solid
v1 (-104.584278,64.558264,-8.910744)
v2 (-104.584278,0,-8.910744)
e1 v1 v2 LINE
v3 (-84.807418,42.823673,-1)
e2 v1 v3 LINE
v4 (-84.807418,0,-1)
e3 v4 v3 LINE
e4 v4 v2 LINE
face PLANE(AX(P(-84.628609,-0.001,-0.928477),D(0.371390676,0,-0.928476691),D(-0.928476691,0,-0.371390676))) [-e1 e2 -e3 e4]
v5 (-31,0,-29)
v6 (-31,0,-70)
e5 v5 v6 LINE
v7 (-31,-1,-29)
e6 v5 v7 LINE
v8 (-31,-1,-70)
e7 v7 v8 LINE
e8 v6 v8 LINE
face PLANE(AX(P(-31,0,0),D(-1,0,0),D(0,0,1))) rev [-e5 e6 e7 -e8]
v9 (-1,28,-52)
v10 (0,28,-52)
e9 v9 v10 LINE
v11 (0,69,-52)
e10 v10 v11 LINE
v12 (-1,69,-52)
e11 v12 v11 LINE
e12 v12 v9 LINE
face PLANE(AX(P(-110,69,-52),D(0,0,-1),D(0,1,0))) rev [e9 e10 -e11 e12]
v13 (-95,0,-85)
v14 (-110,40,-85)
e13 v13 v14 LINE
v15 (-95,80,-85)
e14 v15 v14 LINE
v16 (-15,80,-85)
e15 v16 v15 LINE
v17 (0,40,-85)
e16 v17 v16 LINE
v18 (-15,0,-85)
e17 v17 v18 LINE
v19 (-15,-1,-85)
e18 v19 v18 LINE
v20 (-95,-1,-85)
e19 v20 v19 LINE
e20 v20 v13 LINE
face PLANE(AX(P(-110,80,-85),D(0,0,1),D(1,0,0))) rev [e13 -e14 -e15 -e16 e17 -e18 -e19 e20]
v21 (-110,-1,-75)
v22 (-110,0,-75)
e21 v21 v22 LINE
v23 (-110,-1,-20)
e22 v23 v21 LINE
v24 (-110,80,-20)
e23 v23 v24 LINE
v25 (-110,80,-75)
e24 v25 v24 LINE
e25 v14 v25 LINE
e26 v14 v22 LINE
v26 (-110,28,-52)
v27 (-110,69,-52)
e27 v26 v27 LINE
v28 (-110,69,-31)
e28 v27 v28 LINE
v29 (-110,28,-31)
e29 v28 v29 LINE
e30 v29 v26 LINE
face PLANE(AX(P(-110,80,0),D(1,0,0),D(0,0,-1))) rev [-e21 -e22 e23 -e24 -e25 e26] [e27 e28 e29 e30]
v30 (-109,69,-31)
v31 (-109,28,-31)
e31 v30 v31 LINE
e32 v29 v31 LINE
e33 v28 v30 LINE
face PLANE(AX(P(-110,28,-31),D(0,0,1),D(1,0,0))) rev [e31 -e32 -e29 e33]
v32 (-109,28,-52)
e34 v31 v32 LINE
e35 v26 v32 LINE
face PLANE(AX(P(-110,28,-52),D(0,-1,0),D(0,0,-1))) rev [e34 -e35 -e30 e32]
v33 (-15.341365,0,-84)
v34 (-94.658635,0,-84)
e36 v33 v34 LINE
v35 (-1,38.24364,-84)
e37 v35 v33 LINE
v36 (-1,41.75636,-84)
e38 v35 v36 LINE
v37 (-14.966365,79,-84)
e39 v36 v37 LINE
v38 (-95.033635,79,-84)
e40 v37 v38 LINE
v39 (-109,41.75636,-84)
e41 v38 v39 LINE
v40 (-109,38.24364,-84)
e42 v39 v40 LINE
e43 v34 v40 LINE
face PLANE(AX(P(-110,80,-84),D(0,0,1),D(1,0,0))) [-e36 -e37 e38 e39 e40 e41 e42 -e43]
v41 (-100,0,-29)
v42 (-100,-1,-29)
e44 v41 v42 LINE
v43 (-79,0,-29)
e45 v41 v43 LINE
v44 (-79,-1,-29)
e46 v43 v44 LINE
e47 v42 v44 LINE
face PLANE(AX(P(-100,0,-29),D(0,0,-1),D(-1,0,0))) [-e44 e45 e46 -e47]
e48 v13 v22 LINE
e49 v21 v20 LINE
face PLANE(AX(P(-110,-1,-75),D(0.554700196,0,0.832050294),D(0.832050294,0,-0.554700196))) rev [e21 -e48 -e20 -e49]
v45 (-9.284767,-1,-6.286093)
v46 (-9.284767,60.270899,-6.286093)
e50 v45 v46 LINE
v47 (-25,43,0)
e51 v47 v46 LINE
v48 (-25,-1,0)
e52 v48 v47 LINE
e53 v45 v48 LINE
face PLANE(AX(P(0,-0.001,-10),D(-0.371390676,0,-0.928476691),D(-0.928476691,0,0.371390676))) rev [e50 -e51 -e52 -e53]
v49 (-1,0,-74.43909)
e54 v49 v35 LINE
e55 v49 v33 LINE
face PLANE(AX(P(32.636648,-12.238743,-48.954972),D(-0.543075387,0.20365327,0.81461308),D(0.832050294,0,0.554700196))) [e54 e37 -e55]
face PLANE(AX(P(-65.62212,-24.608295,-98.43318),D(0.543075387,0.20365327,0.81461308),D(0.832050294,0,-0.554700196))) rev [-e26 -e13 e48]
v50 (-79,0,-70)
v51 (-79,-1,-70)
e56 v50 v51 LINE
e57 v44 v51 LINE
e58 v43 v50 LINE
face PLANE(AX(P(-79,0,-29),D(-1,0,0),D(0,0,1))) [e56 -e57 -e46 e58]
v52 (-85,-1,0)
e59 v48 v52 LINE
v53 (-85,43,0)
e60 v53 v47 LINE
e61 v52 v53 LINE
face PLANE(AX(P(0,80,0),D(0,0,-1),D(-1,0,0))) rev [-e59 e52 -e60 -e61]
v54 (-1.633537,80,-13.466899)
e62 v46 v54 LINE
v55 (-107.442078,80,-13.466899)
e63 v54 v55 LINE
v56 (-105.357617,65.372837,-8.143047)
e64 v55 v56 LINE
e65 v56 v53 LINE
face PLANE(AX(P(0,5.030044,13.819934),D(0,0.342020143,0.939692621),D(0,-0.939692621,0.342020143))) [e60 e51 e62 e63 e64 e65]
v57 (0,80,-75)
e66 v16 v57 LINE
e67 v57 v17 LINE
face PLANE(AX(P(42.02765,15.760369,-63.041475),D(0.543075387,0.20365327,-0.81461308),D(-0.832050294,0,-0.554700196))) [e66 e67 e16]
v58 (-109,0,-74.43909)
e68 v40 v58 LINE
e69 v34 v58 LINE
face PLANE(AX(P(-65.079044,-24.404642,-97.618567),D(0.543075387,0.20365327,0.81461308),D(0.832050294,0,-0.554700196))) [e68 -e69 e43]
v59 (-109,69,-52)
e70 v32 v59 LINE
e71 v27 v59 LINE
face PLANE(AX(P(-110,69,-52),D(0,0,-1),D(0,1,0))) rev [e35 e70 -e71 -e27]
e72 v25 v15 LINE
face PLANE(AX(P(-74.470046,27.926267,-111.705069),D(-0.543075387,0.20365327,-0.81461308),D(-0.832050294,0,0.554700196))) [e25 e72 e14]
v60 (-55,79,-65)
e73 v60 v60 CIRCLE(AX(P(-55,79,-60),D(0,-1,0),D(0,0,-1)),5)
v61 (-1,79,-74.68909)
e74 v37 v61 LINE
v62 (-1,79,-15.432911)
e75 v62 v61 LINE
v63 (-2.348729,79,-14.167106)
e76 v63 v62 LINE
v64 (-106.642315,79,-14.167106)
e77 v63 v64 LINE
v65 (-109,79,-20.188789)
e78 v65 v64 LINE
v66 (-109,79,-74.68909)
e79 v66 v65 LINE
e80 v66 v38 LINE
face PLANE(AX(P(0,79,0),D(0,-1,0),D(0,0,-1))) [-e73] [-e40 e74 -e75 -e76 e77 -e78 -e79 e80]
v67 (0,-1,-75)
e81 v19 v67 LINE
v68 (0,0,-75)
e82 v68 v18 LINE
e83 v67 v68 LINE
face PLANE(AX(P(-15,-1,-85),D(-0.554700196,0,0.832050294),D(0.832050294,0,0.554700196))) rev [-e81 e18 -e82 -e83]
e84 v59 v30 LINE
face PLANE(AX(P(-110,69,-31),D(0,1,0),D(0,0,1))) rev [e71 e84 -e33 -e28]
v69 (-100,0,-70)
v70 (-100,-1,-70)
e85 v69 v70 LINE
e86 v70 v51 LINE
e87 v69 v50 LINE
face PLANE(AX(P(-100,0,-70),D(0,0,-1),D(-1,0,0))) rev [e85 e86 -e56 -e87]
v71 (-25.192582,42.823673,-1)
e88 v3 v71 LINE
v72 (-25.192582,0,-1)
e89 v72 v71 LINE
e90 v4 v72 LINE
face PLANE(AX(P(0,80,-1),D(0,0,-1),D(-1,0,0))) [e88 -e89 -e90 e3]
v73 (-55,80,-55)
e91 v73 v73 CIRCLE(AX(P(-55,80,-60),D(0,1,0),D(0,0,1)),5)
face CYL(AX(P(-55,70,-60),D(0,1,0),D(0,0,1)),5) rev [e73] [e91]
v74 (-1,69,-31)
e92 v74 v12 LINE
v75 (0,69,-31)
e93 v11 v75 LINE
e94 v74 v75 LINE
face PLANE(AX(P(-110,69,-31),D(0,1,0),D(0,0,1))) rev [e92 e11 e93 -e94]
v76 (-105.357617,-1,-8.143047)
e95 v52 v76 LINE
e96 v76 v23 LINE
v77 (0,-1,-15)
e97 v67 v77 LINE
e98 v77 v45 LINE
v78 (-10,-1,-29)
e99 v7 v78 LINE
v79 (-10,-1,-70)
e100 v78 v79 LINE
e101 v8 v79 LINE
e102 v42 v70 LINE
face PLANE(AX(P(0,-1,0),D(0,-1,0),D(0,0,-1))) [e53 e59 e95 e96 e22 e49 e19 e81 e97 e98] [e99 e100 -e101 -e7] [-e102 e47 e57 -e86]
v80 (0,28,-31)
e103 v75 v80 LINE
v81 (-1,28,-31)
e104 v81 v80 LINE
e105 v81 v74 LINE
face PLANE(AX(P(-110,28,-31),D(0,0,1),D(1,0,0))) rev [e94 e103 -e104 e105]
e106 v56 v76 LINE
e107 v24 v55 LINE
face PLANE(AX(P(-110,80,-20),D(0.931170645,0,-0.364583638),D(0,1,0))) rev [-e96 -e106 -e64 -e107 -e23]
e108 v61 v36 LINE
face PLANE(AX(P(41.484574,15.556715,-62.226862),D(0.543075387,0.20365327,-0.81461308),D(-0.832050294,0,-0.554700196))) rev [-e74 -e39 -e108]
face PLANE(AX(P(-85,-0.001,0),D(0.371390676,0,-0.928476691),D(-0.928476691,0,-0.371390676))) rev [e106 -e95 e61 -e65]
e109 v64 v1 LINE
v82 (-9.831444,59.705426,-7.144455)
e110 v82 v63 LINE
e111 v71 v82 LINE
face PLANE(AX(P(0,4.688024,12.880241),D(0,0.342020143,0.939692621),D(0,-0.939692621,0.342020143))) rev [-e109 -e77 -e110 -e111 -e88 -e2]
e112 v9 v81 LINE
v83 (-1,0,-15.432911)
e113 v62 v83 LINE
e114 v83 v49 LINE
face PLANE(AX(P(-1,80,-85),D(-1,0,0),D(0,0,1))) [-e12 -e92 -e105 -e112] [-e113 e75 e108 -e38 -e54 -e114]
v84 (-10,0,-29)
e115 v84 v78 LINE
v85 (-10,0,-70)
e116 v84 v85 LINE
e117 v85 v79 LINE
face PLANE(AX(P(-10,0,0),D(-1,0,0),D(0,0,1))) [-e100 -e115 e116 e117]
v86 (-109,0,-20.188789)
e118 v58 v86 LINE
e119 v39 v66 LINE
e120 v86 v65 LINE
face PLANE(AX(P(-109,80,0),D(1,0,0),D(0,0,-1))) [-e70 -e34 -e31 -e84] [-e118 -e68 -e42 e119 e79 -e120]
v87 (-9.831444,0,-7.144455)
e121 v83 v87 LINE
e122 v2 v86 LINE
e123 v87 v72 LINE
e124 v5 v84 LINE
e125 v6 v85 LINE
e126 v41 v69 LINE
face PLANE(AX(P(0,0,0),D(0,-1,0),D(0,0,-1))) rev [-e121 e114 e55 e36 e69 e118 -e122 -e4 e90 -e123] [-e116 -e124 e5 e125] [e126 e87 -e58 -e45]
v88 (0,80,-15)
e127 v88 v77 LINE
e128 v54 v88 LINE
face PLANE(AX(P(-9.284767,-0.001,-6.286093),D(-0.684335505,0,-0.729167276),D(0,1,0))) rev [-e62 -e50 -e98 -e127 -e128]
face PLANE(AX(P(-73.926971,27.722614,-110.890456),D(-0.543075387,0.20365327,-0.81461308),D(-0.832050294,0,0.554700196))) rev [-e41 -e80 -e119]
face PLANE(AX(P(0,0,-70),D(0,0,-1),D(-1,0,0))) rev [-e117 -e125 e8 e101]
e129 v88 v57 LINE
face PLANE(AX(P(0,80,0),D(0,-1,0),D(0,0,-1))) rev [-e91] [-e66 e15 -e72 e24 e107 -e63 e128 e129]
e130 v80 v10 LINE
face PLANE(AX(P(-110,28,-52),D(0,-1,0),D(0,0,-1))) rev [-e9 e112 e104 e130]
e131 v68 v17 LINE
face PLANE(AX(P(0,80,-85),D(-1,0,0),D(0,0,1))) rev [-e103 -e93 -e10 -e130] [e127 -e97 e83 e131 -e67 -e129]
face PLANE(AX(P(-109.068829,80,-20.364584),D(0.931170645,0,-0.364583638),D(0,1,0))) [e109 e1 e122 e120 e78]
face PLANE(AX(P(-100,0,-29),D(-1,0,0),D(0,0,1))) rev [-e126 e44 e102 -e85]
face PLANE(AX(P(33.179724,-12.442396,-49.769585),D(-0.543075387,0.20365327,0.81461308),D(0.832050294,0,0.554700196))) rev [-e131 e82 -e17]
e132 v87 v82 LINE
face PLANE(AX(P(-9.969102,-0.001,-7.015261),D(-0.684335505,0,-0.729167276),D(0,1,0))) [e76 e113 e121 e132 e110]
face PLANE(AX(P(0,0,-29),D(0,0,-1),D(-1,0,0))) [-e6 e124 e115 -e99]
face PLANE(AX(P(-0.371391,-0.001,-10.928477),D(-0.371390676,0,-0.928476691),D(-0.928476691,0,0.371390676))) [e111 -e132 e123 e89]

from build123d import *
from OCP.BRepFilletAPI import BRepFilletAPI_MakeChamfer

# Parameters (mm, degrees)
SKETCH_1_W                 = 110
SKETCH_1_H                 = 85
EXTRUDE_1_DEPTH            = 80
CUT_EXTRUDE_1_REACH        = 162.39
CHAMFER_1_SIZE             = 5
CHAMFER_1_SIZE2            = 10
SPLIT_START                = 61.095980997
SPLIT_BODIES_3_OUTLINE_W   = 98
SPLIT_BODIES_3_OUTLINE_H   = 75
SPLIT_BODIES_3_DEPTH       = 8.1461308
SPLIT_START_2              = -128.980404327
SPLIT_BODIES_3_2_OUTLINE_W = 98
SPLIT_BODIES_3_2_OUTLINE_H = 75
SPLIT_BODIES_3_2_DEPTH     = 8.146130799
SPLIT_START_3              = -145.272665927
SPLIT_BODIES_3_3_OUTLINE_W = 98
SPLIT_BODIES_3_3_OUTLINE_H = 76
SPLIT_BODIES_3_3_DEPTH     = 8.1461308
SPLIT_START_4              = 77.388242596
SPLIT_BODIES_3_4_OUTLINE_W = 99
SPLIT_BODIES_3_4_OUTLINE_H = 76
SPLIT_BODIES_3_4_DEPTH     = 8.1461308
SHELL_2_T                  = -1
SKETCH_6_R                 = 5
CUT_EXTRUDE_2_DEPTH        = 10
SKETCH_7_W                 = 21
SKETCH_7_H                 = 41
CUT_EXTRUDE_3_DEPTH        = 161.390149323
EXTRUDE_2_DEPTH            = 1
SKETCH_9_W                 = 21
SKETCH_9_H                 = 41
CUT_EXTRUDE_5_DEPTH        = 1


# Read off the part's stored shape, not the designer's step: 分割3
with BuildPart() as part:
    # 草图1 → 凸台-拉伸1 (new body)
    with BuildSketch(Plane(origin=(0, 0, 0), x_dir=(1, 0, 0), z_dir=(0, 1, 0))):
        with Locations((-55, 42.5)):
            Rectangle(SKETCH_1_W, SKETCH_1_H)
    extrude(amount=EXTRUDE_1_DEPTH)

    # 草图2 → 切除-拉伸1 (cut, up to next)
    with BuildSketch(Plane(origin=(0, 80, 0), x_dir=(1, 0, 0), z_dir=(0, 1, 0)), mode=Mode.PRIVATE) as cut_extrude_1_sk1:
        Polygon((-85, 0), (-110, 10), (-110, 0), align=None)
    cut_extrude_1_tool1 = extrude(cut_extrude_1_sk1.sketch, amount=-CUT_EXTRUDE_1_REACH, mode=Mode.PRIVATE) & part.part
    # 草图2 → 切除-拉伸1 (cut, up to next)
    with BuildSketch(Plane(origin=(0, 80, 0), x_dir=(1, 0, 0), z_dir=(0, 1, 0)), mode=Mode.PRIVATE) as cut_extrude_1_sk2:
        Polygon((0, 10), (-25, 0), (0, 0), align=None)
    cut_extrude_1_tool2 = extrude(cut_extrude_1_sk2.sketch, amount=-CUT_EXTRUDE_1_REACH, mode=Mode.PRIVATE) & part.part
    add(cut_extrude_1_tool1.solids().sort_by_distance((-101.666667, 80, -3.333333))[0], mode=Mode.SUBTRACT)
    add(cut_extrude_1_tool2.solids().sort_by_distance((-8.333333, 80, -3.333333))[0], mode=Mode.SUBTRACT)

    # Split Bodies 2
    split(bisect_by=Plane(origin=(0, 5.030044473, 13.819933608), x_dir=(0, 0.9396926207859094, -0.3420201433256661), z_dir=(0, 0.3420201433256661, 0.9396926207859094)), keep=Keep.BOTTOM)

    # 倒角1: one chamfer whose edges measure the first distance from different faces: ONE call of the kernel's chamfer builder (chamfer() names one face for all edges)
    chamfer_1_edges_1 = [part.edges().sort_by_distance(p)[0] for p in [
        (-110, 35.237387097, -10),
    ]]
    chamfer_1_side_1 = [part.faces().sort_by_distance(p)[0] for p in [
        (-98.508842949, 28.923048193, -5.40353718),
    ]]
    chamfer_1_edges_2 = [part.edges().sort_by_distance(p)[0] for p in [
        (0, 35.237387097, -10),
    ]]
    chamfer_1_side_2 = [part.faces().sort_by_distance(p)[0] for p in [
        (0, 39.898381252, -47.600292644),
    ]]
    chamfer_1 = BRepFilletAPI_MakeChamfer(part.part.solid().wrapped)
    for e in chamfer_1_edges_1:
        chamfer_1.Add(CHAMFER_1_SIZE, CHAMFER_1_SIZE2, e.wrapped, chamfer_1_side_1[0].wrapped)  # the first distance lies on this face
    for e in chamfer_1_edges_2:
        chamfer_1.Add(CHAMFER_1_SIZE, CHAMFER_1_SIZE2, e.wrapped, chamfer_1_side_2[0].wrapped)  # the first distance lies on this face
    add(Compound.cast(chamfer_1.Shape()), mode=Mode.REPLACE)

    # Split Bodies 3 outline → Split Bodies 3 (cut)
    with BuildSketch(Plane(origin=(0, 0, 0), x_dir=(0.839683943173837, 0.13171512834099375, 0.5268605133639755), z_dir=(0.5430753866417041, -0.20365326999063904, -0.8146130799625572)).offset(SPLIT_START)):
        with Locations((-79, -54.5)):
            Rectangle(SPLIT_BODIES_3_OUTLINE_W, SPLIT_BODIES_3_OUTLINE_H)
    extrude(amount=SPLIT_BODIES_3_DEPTH, mode=Mode.SUBTRACT)

    # Split Bodies 3 2 outline → Split Bodies 3 2 (cut)
    with BuildSketch(Plane(origin=(0, 0, 0), x_dir=(0.8396839431738365, -0.13171512834099394, -0.5268605133639763), z_dir=(0.5430753866417047, 0.20365326999063899, 0.8146130799625568)).offset(SPLIT_START_2)):
        with Locations((-13, 54.5)):
            Rectangle(SPLIT_BODIES_3_2_OUTLINE_W, SPLIT_BODIES_3_2_OUTLINE_H)
    extrude(amount=SPLIT_BODIES_3_2_DEPTH, mode=Mode.SUBTRACT)

    # Split Bodies 3 3 outline → Split Bodies 3 3 (cut)
    with BuildSketch(Plane(origin=(0, 0, 0), x_dir=(0.8396839431738365, 0.13171512834099394, -0.5268605133639763), z_dir=(0.5430753866417047, -0.20365326999063899, 0.8146130799625568)).offset(SPLIT_START_3)):
        with Locations((-2, 23)):
            Rectangle(SPLIT_BODIES_3_3_OUTLINE_W, SPLIT_BODIES_3_3_OUTLINE_H)
    extrude(amount=SPLIT_BODIES_3_3_DEPTH, mode=Mode.SUBTRACT)

    # Split Bodies 3 4 outline → Split Bodies 3 4 (cut)
    with BuildSketch(Plane(origin=(0, 0, 0), x_dir=(0.839683943173837, -0.13171512834099375, 0.5268605133639755), z_dir=(0.5430753866417041, 0.20365326999063904, -0.8146130799625572)).offset(SPLIT_START_4)):
        with Locations((-89.5, -23)):
            Rectangle(SPLIT_BODIES_3_4_OUTLINE_W, SPLIT_BODIES_3_4_OUTLINE_H)
    extrude(amount=SPLIT_BODIES_3_4_DEPTH, mode=Mode.SUBTRACT)

    # 抽壳2
    shell_2_openings = [part.faces().sort_by_distance(p)[0] for p in [
        (-54.995965718, 0, -43.10116127),
    ]]
    offset(amount=SHELL_2_T, openings=shell_2_openings, kind=Kind.INTERSECTION)

    # 草图6 → 切除-拉伸2 (cut)
    with BuildSketch(Plane(origin=(0, 80, 0), x_dir=(1, 0, 0), z_dir=(0, 1, 0))):
        with Locations(Location((-55, 60, 0), (0, 0, 270))):
            Circle(SKETCH_6_R)
    extrude(amount=-CUT_EXTRUDE_2_DEPTH, mode=Mode.SUBTRACT)

    # 草图7 → 切除-拉伸3 (cut, through all)
    with BuildSketch(Plane(origin=(0, 0, 0), x_dir=(0, 0, -1), z_dir=(1, 0, 0))):
        with Locations((41.5, 48.5)):
            Rectangle(SKETCH_7_W, SKETCH_7_H)
    extrude(amount=-CUT_EXTRUDE_3_DEPTH, mode=Mode.SUBTRACT)

    # 草图8 → 凸台-拉伸2 (add)
    with BuildSketch(Plane.XZ):
        Polygon((-110, -75), (-95, -85), (-15, -85), (0, -75), (0, -15), (-9.284766909, -6.286093236), (-25, 0), (-85, 0), (-105.357616546, -8.143046618), (-110, -20), align=None)
    extrude(amount=EXTRUDE_2_DEPTH)

    # 草图9 → 切除-拉伸5 (cut)
    with BuildSketch(Plane.XZ.offset(1)):
        with Locations((-20.5, -49.5)):
            Rectangle(SKETCH_9_W, SKETCH_9_H)
        with Locations((-89.5, -49.5)):
            Rectangle(SKETCH_9_W, SKETCH_9_H)
    extrude(amount=-CUT_EXTRUDE_5_DEPTH, mode=Mode.SUBTRACT)


solid = part.part
